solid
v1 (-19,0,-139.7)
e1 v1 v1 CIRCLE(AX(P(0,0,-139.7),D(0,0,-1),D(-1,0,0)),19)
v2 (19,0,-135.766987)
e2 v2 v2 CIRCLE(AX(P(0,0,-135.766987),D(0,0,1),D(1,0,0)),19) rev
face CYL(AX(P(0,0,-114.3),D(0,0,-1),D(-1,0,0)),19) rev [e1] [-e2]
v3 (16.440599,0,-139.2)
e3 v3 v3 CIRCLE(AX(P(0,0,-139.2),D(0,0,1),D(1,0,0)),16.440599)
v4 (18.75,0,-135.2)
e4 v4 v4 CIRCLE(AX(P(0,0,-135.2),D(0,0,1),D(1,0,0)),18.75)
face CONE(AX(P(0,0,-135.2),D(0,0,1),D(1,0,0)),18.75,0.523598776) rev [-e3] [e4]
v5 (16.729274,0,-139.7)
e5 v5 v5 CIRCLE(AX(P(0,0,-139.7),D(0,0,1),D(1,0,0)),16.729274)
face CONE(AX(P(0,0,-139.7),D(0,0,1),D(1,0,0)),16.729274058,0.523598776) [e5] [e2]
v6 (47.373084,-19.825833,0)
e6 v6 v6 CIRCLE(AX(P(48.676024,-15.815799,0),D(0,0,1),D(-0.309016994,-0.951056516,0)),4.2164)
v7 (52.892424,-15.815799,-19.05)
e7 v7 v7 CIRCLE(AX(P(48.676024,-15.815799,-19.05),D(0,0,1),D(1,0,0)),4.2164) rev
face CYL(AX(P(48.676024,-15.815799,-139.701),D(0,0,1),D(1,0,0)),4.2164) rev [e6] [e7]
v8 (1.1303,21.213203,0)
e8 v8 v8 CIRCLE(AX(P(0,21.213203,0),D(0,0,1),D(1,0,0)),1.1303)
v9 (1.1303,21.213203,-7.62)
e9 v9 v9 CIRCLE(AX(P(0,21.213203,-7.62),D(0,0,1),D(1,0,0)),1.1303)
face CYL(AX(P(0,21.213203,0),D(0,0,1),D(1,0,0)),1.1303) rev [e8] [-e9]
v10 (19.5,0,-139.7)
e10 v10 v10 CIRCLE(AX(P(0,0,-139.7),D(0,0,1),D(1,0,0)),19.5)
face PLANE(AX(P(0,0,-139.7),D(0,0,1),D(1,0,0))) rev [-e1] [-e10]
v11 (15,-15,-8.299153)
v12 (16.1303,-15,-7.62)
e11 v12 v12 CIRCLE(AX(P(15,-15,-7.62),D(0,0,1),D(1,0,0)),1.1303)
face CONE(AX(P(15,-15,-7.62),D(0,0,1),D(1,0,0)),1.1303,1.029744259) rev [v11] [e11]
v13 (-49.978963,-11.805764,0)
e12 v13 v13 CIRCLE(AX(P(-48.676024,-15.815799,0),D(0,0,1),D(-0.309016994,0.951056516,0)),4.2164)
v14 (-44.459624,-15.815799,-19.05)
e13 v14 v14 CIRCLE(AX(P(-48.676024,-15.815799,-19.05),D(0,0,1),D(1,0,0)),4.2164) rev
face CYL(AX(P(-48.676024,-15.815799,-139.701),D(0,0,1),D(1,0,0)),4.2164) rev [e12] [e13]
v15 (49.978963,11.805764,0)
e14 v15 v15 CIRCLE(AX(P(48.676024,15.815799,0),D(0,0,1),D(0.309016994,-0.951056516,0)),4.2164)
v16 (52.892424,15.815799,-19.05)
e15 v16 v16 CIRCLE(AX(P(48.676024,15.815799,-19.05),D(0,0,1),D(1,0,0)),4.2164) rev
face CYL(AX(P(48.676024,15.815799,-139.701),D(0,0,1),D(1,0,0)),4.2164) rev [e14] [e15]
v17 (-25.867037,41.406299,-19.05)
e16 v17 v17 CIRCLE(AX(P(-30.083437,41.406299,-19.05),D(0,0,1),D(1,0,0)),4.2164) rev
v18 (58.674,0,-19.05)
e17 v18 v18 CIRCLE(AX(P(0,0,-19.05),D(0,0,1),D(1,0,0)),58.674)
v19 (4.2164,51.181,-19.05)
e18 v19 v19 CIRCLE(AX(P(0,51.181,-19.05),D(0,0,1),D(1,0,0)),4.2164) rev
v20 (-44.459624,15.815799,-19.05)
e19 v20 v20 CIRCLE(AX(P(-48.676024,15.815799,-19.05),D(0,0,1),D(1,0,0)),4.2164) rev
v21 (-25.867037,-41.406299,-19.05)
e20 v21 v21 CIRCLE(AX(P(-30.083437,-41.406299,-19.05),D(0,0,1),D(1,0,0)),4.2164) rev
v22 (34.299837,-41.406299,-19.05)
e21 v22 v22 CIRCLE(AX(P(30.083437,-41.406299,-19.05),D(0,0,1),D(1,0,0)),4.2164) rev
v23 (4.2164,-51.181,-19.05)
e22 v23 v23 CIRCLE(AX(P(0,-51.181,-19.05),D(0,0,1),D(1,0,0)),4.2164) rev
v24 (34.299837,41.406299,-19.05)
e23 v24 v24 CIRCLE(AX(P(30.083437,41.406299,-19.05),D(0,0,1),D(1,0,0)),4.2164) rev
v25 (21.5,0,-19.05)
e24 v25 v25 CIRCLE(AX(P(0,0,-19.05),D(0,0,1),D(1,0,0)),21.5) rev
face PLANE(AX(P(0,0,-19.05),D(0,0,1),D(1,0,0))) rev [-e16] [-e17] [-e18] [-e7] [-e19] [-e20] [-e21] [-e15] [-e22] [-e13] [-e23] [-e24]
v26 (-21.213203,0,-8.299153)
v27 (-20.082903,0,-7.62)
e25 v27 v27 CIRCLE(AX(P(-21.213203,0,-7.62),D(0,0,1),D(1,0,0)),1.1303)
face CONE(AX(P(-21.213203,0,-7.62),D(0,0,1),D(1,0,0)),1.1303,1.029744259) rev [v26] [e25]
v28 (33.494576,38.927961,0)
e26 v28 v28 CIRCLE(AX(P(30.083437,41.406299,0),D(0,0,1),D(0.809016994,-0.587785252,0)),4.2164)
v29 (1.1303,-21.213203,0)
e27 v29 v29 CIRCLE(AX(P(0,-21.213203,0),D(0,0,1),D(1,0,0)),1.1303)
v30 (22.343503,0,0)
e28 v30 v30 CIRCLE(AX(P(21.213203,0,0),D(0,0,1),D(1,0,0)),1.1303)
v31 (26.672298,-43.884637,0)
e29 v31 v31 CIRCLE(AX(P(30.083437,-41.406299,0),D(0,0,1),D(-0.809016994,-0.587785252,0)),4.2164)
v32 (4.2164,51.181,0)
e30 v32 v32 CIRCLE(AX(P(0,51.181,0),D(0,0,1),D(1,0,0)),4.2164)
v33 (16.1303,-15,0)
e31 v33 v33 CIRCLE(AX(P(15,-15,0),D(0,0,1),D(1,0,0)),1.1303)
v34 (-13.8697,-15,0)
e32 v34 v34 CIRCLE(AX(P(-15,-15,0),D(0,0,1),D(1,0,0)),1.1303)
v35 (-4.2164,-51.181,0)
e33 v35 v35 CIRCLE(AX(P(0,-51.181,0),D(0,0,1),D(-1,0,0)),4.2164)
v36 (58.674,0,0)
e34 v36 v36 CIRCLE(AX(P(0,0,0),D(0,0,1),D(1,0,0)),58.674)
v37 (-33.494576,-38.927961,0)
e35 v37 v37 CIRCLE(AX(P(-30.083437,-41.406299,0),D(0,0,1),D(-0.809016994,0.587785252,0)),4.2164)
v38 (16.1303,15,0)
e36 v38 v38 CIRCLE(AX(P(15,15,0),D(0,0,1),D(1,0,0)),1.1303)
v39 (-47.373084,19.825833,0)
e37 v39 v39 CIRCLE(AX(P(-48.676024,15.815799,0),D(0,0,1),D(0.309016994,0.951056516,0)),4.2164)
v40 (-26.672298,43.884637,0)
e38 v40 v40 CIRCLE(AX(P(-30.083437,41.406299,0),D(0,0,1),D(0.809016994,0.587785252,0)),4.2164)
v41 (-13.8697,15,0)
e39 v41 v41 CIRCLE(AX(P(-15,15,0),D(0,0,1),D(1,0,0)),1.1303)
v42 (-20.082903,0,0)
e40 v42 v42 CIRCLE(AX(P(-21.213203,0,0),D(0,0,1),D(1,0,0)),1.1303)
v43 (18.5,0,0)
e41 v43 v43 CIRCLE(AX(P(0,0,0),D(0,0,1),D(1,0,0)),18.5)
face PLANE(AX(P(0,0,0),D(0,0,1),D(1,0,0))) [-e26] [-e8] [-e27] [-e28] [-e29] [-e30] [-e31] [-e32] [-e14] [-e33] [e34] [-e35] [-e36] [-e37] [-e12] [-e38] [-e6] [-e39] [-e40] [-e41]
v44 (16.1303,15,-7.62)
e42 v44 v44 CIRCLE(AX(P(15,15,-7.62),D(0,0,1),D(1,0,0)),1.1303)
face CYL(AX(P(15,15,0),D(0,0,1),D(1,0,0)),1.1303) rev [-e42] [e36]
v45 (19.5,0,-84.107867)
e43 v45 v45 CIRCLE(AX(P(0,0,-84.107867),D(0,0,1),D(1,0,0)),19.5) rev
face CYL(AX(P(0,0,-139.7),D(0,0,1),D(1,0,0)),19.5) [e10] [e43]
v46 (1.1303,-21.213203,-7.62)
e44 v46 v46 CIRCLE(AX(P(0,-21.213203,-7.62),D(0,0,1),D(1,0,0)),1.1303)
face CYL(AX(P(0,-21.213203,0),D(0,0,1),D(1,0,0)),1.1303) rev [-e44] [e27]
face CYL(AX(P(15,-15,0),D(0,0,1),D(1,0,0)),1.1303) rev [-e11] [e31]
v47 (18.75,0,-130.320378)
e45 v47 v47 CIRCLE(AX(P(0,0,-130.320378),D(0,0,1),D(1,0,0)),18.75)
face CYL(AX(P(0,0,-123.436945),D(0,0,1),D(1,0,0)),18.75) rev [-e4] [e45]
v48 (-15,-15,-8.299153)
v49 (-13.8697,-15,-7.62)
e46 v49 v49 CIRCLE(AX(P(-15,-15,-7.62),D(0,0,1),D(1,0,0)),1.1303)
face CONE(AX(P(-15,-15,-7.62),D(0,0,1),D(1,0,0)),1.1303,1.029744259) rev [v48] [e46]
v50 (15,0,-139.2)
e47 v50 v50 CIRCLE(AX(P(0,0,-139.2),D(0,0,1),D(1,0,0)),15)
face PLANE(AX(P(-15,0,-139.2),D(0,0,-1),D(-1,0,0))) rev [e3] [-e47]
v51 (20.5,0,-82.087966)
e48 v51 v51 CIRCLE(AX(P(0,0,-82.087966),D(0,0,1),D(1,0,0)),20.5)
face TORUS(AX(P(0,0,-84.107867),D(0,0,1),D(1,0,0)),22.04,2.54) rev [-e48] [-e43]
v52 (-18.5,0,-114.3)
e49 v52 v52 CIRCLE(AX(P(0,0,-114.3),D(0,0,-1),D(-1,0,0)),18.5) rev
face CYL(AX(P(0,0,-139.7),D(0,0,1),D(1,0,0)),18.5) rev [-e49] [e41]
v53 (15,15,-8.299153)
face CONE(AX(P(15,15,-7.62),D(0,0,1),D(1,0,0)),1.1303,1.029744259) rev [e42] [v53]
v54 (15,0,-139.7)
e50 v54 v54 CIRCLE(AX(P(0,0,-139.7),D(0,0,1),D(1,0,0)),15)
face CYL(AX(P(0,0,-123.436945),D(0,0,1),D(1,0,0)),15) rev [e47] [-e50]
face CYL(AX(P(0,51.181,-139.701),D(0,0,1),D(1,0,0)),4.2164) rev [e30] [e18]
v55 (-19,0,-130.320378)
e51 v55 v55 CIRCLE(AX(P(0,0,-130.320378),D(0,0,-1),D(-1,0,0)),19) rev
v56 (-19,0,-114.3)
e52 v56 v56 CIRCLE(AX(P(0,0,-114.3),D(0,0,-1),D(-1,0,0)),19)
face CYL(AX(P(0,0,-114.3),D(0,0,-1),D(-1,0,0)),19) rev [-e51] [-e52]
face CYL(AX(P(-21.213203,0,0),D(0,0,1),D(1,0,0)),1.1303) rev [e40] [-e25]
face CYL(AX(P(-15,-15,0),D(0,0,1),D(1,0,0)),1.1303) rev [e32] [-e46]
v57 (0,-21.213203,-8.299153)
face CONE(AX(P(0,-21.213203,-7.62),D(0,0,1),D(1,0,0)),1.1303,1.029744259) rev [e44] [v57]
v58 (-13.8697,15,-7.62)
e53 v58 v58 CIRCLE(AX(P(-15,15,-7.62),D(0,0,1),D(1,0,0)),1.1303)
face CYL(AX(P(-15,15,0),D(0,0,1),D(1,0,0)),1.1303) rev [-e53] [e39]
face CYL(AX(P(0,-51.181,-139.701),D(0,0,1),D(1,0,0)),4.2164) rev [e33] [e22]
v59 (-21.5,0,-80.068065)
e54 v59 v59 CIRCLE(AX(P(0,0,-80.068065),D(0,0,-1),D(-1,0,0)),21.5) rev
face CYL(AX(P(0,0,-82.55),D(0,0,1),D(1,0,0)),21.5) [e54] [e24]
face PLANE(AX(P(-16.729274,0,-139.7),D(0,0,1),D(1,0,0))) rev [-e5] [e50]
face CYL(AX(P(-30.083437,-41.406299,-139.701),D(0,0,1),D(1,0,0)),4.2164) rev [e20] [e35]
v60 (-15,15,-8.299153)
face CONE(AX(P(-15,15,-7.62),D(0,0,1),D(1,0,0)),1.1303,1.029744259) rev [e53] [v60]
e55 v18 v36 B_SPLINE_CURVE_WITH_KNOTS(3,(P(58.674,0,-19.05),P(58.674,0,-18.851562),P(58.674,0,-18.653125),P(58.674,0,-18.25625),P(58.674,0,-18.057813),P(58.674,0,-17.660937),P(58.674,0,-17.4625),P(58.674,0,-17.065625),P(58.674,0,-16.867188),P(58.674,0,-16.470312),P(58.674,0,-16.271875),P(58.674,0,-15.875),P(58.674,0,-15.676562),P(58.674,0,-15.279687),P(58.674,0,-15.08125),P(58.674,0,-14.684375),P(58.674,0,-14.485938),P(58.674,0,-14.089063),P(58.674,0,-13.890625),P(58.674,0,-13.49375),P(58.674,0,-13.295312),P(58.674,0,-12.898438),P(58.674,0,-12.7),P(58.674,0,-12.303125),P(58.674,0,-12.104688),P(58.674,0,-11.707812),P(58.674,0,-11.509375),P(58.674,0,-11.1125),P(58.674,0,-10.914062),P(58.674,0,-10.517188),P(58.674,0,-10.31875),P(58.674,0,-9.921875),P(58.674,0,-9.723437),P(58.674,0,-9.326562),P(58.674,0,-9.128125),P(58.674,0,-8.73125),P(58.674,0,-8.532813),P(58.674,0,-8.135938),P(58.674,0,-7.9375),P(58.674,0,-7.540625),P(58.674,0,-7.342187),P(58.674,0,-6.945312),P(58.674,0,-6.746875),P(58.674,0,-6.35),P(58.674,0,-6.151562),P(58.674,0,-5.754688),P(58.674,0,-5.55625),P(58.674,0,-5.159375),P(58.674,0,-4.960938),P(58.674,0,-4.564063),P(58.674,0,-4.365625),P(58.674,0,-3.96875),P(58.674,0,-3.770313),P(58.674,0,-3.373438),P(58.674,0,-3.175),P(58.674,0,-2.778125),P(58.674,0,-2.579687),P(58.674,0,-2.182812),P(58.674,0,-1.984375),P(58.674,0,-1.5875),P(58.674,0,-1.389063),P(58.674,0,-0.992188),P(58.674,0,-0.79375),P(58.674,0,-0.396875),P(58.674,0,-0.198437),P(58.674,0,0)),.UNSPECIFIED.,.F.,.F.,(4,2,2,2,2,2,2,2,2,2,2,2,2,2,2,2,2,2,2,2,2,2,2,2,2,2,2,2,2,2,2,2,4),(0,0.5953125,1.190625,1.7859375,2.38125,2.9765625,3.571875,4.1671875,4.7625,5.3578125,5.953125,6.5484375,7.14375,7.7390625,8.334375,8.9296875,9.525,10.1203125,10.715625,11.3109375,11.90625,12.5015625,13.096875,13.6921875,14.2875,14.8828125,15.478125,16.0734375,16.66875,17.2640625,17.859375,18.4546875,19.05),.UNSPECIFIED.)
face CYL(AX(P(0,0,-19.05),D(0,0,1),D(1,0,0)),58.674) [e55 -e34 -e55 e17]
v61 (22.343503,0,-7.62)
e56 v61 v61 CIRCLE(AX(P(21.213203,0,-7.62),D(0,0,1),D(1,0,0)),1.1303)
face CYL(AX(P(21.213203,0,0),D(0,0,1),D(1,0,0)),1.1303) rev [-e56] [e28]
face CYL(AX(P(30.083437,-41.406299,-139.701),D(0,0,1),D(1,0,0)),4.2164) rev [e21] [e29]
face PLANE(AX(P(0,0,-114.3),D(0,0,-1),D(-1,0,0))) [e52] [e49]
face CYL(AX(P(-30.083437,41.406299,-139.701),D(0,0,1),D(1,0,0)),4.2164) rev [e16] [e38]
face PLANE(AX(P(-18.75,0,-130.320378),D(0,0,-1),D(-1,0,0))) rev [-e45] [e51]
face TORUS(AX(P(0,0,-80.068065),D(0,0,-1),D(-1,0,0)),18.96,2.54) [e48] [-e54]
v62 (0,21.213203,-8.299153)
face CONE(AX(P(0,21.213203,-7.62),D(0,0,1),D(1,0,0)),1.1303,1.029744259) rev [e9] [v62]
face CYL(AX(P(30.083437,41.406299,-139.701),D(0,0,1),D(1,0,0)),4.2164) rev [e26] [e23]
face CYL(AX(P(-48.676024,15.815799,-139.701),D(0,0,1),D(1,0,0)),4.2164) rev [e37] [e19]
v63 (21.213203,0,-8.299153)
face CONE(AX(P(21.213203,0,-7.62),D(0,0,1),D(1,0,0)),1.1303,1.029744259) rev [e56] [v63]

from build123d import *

# Parameters (mm, degrees)
SKETCH1_R                 = 19.5
SKETCH1_R_2               = 18.5
EXTRUDE1_DEPTH            = 139.7
SKETCH4_R                 = 58.674
SKETCH4_R_2               = 19.5
EXTRUDE2_DEPTH            = 19.05
CUT_EXTRUDE1_REACH        = 164.485
SKETCH5_R                 = 4.2164
CIRPATTERN1_COUNT         = 10
F_4_40_TAPPED_HOLE2_D     = 2.2606
F_4_40_TAPPED_HOLE2_DEPTH = 7.62
F_4_40_TAPPED_HOLE2_TIP   = 0.679152758
SKETCH10_R                = 19
EXTRUDE3_DEPTH            = 25.4
EXTRUDE4_START            = 63.5
SKETCH12_R                = 21.5
SKETCH12_R_2              = 19
EXTRUDE4_DEPTH            = 63.5
FILLET1_R                 = 2.54
FILLET2_R                 = 2.54


with BuildPart() as part:
    # Sketch1 → Extrude1 (new body)
    with BuildSketch(Plane.XY):
        Circle(SKETCH1_R)
        Circle(SKETCH1_R_2, mode=Mode.SUBTRACT)
    extrude(amount=-EXTRUDE1_DEPTH)

    # Sketch4 → Extrude2 (add)
    with BuildSketch(Plane.XY):
        Circle(SKETCH4_R)
        Circle(SKETCH4_R_2, mode=Mode.SUBTRACT)
    extrude(amount=-EXTRUDE2_DEPTH)

    # Sketch5 → Cut-Extrude1 (cut, up to next)
    with BuildSketch(Plane.XY, mode=Mode.PRIVATE) as cut_extrude1_sk1:
        with Locations((0, 51.181)):
            Circle(SKETCH5_R)
    cut_extrude1_tool1 = extrude(cut_extrude1_sk1.sketch, amount=-CUT_EXTRUDE1_REACH, mode=Mode.PRIVATE) & part.part
    cut_extrude1 = cut_extrude1_tool1.solids().sort_by_distance((0, 51.181, 0))[0]
    add(cut_extrude1, mode=Mode.SUBTRACT)

    # CirPattern1: Cut-Extrude1 ×10 about axis
    cirpattern1_axis = Axis((0, 0, 0), (0, 0, 1))
    for i in range(1, CIRPATTERN1_COUNT):
        add(cut_extrude1.rotate(cirpattern1_axis, i * 360 / CIRPATTERN1_COUNT), mode=Mode.SUBTRACT)

    # #4-40 Tapped Hole2
    with Locations(Plane.XY):
        with Locations((15, -15), (-15, -15), (-15, 15), (15, 15), (0, 21.213203436), (-21.213203436, 0), (21.213203436, 0), (0, -21.213203436)):
            Hole(F_4_40_TAPPED_HOLE2_D / 2, depth=F_4_40_TAPPED_HOLE2_DEPTH)
            with Locations((0, 0, -(F_4_40_TAPPED_HOLE2_DEPTH + F_4_40_TAPPED_HOLE2_TIP / 2))):  # 118° drill point
                Cone(0, F_4_40_TAPPED_HOLE2_D / 2, F_4_40_TAPPED_HOLE2_TIP, mode=Mode.SUBTRACT)

    # Sketch10 → Extrude3 (cut)
    with BuildSketch(Plane(origin=(0, 0, -139.7), x_dir=(-1, 0, 0), z_dir=(0, 0, -1))):
        Circle(SKETCH10_R)
    extrude(amount=-EXTRUDE3_DEPTH, mode=Mode.SUBTRACT)

    # Sketch11 → Revolve1 (revolve)
    with BuildSketch(Plane(origin=(0, 0, 0), x_dir=(1, 0, 0), z_dir=(0, 1, 0)), mode=Mode.PRIVATE) as revolve1_sk:
        Polygon((-15, 139.7), (-15, 139.2), (-16.440598923, 139.2), (-18.75, 135.2), (-18.75, 130.320377846), (-19.25, 130.320377846), (-19.25, 135.333974596), (-16.729274058, 139.7), align=None)
    revolve(revolve1_sk.sketch.rotate(Axis((0, 0, -123.436944837), (0, 0, -1)), 180), axis=Axis((0, 0, -123.436944837), (0, 0, -1)))

    # Sketch12 → Extrude4 (add)
    with BuildSketch(Plane(origin=(0, 0, -19.05), x_dir=(-1, 0, 0), z_dir=(0, 0, -1)).offset(EXTRUDE4_START)):
        with Locations(Location((0, 0, 0), (0, 0, 180))):
            Circle(SKETCH12_R)
        Circle(SKETCH12_R_2, mode=Mode.SUBTRACT)
    extrude(amount=-EXTRUDE4_DEPTH)

    # Fillet1
    # the kernel refuses this fillet: 2.54 mm, written as the material it takes off along each edge
    with BuildSketch(Plane(origin=(0, 0, -82.55), x_dir=(1, 0, 0), z_dir=(0, 1, 0))) as fillet1_piece_1:
        with BuildLine():
            CenterArc((18.96, -2.481934729), FILLET1_R, 0, 77.725329785)
            Line((21.5, -2.481934729), (21.5508, -2.481934729))
            Line((21.5508, -2.481934729), (21.5508, 0))
            Line((21.5508, 0), (21.5, 0.0508))
            ThreePointArc((21.5, 0.0508), (20.5, 0.0508), (19.5108, 0.049638695))
            Line((19.5108, 0.049638695), (19.5, 0))
        make_face()
    revolve(axis=Axis((0, 0, -82.55), (0, 0, -1)), mode=Mode.SUBTRACT)

    # Fillet2
    fillet2_edges = [part.edges().sort_by_distance(p)[0] for p in [
        (-19.5, 0, -82.55),
    ]]
    fillet(fillet2_edges, radius=FILLET2_R)


solid = part.part
